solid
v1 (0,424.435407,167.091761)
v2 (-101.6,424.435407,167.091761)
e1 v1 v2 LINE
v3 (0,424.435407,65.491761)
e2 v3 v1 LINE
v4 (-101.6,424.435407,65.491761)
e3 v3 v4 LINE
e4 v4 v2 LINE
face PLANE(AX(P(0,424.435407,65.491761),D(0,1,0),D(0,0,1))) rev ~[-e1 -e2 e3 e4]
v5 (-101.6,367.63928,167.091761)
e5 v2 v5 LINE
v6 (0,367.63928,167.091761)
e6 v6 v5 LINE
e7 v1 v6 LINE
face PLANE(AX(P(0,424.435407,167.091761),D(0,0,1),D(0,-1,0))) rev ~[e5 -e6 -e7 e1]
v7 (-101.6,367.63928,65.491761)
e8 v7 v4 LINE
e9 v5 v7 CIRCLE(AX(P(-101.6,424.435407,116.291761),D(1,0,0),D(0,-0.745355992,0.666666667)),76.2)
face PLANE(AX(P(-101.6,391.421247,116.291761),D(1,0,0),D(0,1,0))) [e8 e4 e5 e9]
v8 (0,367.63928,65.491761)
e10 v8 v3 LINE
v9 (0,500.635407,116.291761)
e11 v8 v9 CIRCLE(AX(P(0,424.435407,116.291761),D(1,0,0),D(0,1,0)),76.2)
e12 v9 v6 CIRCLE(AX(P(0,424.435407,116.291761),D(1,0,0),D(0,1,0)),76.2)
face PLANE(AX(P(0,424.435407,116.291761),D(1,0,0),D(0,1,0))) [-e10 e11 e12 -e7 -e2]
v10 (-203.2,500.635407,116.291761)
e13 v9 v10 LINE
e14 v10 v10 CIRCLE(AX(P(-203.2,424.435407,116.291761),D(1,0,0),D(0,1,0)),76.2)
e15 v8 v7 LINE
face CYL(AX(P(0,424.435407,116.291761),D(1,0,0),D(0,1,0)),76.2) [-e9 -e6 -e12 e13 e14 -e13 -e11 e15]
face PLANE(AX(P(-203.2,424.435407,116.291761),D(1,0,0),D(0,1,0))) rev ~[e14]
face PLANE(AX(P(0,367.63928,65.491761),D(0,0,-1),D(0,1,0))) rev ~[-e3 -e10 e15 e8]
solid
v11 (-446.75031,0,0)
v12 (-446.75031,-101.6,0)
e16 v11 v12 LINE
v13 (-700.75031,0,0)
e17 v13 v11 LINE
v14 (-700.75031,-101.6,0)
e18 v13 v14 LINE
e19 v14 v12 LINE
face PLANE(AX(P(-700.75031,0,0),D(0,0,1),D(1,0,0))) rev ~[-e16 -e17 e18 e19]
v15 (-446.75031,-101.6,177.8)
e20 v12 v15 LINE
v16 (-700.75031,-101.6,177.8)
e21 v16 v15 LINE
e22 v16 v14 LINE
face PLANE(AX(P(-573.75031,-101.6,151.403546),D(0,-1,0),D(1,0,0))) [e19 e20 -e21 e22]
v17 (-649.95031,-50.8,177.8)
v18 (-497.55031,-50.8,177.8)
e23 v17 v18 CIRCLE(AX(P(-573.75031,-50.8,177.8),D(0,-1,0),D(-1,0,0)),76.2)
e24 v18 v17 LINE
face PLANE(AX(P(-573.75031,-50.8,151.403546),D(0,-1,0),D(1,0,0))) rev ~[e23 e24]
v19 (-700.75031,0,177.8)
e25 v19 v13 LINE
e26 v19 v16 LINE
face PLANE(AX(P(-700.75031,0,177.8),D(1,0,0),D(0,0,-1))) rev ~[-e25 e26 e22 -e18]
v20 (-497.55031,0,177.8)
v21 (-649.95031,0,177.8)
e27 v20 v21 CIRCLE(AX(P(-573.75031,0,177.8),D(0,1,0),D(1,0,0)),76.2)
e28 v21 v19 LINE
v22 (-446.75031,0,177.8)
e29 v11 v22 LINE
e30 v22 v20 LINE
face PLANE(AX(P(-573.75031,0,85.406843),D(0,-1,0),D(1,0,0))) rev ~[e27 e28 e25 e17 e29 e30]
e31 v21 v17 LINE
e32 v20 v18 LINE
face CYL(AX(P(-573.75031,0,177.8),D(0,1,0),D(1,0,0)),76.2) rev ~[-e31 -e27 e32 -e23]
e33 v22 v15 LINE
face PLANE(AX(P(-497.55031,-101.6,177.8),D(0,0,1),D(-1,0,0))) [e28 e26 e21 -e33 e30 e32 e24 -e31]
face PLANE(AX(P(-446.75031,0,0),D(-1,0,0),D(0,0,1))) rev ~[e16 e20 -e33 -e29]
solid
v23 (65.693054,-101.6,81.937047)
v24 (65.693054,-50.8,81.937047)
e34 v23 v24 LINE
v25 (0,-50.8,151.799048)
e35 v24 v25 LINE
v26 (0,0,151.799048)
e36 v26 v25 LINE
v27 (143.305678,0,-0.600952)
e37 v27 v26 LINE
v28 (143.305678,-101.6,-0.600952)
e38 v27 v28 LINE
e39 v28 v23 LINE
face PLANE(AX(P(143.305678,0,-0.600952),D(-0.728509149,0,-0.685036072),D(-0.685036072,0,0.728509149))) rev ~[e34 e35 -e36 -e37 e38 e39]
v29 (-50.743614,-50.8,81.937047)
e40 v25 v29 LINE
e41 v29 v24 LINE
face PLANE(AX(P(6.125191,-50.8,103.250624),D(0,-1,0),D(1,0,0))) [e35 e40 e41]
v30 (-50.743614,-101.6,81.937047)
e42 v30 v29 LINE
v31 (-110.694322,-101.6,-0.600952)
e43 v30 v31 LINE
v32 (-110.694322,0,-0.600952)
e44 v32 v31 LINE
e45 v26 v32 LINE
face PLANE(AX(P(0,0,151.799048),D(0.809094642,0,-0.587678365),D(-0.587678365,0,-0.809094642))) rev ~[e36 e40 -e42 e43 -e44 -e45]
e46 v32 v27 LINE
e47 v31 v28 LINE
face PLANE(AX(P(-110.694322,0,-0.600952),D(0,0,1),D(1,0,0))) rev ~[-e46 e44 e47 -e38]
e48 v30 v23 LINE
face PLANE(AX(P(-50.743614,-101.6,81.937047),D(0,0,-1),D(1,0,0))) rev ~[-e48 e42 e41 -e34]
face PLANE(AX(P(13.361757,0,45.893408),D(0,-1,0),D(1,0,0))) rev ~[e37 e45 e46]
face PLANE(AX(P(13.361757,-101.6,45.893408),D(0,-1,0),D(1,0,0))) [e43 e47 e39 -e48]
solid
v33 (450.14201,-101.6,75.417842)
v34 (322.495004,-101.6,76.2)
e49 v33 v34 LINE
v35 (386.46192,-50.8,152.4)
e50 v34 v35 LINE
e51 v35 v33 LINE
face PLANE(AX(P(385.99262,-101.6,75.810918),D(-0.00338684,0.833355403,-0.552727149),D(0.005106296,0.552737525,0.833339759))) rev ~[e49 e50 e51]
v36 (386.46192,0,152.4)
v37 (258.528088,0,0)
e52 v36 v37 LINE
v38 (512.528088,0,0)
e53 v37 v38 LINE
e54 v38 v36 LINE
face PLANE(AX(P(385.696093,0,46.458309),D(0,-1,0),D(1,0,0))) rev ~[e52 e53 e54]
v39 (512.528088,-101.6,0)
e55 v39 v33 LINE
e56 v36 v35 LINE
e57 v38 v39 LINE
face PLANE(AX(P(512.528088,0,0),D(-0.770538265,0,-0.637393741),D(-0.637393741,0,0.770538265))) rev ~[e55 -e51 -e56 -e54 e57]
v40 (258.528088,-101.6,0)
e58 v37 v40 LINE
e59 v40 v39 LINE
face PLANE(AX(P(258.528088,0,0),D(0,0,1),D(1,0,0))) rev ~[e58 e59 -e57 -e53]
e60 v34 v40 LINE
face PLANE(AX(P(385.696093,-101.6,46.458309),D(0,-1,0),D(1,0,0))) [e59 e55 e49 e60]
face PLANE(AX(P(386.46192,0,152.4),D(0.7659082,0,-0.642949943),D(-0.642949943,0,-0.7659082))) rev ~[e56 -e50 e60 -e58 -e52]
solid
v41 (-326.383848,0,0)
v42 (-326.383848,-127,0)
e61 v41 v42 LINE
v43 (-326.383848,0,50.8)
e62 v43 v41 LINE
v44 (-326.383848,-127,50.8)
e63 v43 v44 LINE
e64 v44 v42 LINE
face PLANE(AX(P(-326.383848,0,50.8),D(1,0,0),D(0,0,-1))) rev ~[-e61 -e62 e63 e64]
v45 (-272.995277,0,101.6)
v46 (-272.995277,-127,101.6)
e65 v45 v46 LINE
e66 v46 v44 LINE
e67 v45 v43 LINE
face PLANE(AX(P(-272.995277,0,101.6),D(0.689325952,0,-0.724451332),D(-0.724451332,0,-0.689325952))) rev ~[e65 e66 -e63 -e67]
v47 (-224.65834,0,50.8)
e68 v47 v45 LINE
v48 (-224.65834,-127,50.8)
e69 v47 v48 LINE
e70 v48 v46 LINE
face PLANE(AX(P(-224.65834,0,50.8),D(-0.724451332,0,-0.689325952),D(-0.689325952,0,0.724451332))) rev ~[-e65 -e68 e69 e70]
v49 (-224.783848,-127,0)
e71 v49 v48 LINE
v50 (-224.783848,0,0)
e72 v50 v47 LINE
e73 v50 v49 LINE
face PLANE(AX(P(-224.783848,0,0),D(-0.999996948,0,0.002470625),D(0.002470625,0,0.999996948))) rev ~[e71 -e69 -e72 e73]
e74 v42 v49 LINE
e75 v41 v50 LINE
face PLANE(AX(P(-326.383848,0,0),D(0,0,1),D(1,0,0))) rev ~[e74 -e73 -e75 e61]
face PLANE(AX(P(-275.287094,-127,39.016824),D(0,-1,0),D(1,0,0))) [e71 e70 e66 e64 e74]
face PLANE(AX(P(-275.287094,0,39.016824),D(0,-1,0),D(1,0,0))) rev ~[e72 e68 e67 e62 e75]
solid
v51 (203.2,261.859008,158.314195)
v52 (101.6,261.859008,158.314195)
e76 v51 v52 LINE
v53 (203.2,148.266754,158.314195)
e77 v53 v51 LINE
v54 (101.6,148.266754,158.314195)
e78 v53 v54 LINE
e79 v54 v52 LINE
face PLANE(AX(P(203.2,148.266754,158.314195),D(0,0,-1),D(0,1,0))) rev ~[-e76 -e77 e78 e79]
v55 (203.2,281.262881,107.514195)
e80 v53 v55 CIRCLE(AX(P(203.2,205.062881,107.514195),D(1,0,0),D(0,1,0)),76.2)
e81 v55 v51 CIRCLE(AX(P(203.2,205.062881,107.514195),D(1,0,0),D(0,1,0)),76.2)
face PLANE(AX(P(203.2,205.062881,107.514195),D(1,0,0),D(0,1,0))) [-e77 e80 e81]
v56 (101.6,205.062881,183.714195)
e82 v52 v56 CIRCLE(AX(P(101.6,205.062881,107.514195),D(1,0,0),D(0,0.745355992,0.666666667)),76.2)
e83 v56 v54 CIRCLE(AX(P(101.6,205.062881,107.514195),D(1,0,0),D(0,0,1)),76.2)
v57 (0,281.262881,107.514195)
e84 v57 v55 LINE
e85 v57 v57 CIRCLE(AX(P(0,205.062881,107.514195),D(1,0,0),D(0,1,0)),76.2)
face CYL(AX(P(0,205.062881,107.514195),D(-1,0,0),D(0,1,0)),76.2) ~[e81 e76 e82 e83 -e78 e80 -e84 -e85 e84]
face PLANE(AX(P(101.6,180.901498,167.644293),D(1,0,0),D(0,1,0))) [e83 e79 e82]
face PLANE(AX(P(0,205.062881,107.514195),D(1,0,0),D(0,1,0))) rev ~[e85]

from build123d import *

# Parameters (mm, degrees)
F1_DEPTH  = 101.6
F3_DEPTH  = 50.8
F5_DEPTH  = 101.6
F9_DEPTH  = 177.8
F11_DEPTH = 127
F16_R     = 76.2
F17_DEPTH = 203.2
F19_DEPTH = 101.6
F20_R     = 76.2
F21_DEPTH = 203.2
F23_DEPTH = 101.6
F25_DEPTH = 101.6
F27_DEPTH = 50.8


# Not quite as in the source:
# - the program builds the solid bodies; features that only make, move or delete a surface that nothing else refers to are left out


with BuildPart() as f1:
    # F0 (on Front) → F1 (new body)
    with BuildSketch(Plane.XZ):
        Polygon((0, 151.7990483895), (-110.6943220668, -0.6009516105), (143.3056779332, -0.6009516105), align=None)
    extrude(amount=F1_DEPTH)

    # F2 (on face) → F3 (cut)
    with BuildSketch(Plane.XZ.offset(101.6)):
        Polygon((-50.7436143692, 81.9370474714), (0, 81.9370474714), (65.6930538277, 81.9370474714), (0, 151.7990483895), align=None)
    extrude(amount=-F3_DEPTH, mode=Mode.SUBTRACT)


with BuildPart() as f5:
    # F4 (on Front) → F5 (new body)
    with BuildSketch(Plane.XZ):
        Polygon((386.4619200636, 152.4), (258.5280877834, 0), (512.5280877834, 0), align=None)
    extrude(amount=F5_DEPTH)

    # F8 (on 3pt) → F9 (cut, symmetric)
    with BuildSketch(Plane(origin=(385.5136131508, 0, -2.362237903), x_dir=(0, 1, 0), z_dir=(0.9999812273, 0, -0.0061273934))):
        Polygon((-50.8, 154.765143255), (-101.6, 154.765143255), (-101.6, 78.1746232731), align=None)
    extrude(amount=F9_DEPTH, both=True, mode=Mode.SUBTRACT)


with BuildPart() as f11:
    # F10 (on Front) → F11 (new body)
    with BuildSketch(Plane.XZ):
        Polygon((-326.3838480476, 0), (-224.7838480476, 0), (-224.6583398959, 50.8), (-272.99527684, 101.6), (-326.3838480476, 50.8), align=None)
    extrude(amount=F11_DEPTH)


with BuildPart() as f17:
    # F16 (on Right) → F17 (new body)
    with BuildSketch(Plane.YZ):
        with Locations((205.0628811121, 107.5141951442)):
            Circle(F16_R)
    extrude(amount=F17_DEPTH)

    # F18 (on face) → F19 (cut)
    with BuildSketch(Plane.YZ.offset(203.2)):
        with BuildLine():
            ThreePointArc((205.0628811121, 183.7141951442), (173.9543613788, 177.0749599473), (148.2667544836, 158.3141951442))
            Line((148.2667544836, 158.3141951442), (205.0628811121, 158.3141951442))
            Line((205.0628811121, 158.3141951442), (205.0628811121, 183.7141951442))
        make_face()
        with BuildLine():
            Line((205.0628811121, 183.7141951442), (205.0628811121, 158.3141951442))
            Line((205.0628811121, 158.3141951442), (261.8590077406, 158.3141951442))
            ThreePointArc((261.8590077406, 158.3141951442), (236.1714008454, 177.0749599473), (205.0628811121, 183.7141951442))
        make_face()
    extrude(amount=-F19_DEPTH, mode=Mode.SUBTRACT)


with BuildPart() as f21:
    # F20 (on Right) → F21 (new body)
    with BuildSketch(Plane.YZ):
        with Locations((424.4354069233, 116.2917613983)):
            Circle(F20_R)
    extrude(amount=-F21_DEPTH)

    # F22 (on face) → F23 (cut)
    with BuildSketch(Plane.YZ):
        with BuildLine():
            Line((424.4354069233, 65.4917613983), (424.4354069233, 116.2917613983))
            Line((424.4354069233, 116.2917613983), (424.4354069233, 167.0917613983))
            Line((424.4354069233, 167.0917613983), (367.6392802948, 167.0917613983))
            ThreePointArc((367.6392802948, 167.0917613983), (348.2354069233, 116.2917613983), (367.6392802948, 65.4917613983))
            Line((367.6392802948, 65.4917613983), (424.4354069233, 65.4917613983))
        make_face()
    extrude(amount=-F23_DEPTH, mode=Mode.SUBTRACT)


with BuildPart() as f25:
    # F24 (on Front) → F25 (new body)
    with BuildSketch(Plane.XZ):
        with BuildLine():
            Line((-700.7503095217, 0), (-446.7503095217, 0))
            Line((-446.7503095217, 0), (-446.7503095217, 177.8))
            Line((-446.7503095217, 177.8), (-497.5503095217, 177.8))
            ThreePointArc((-497.5503095217, 177.8), (-573.7503095217, 101.6), (-649.9503095217, 177.8))
            Line((-649.9503095217, 177.8), (-700.7503095217, 177.8))
            Line((-700.7503095217, 177.8), (-700.7503095217, 0))
        make_face()
    extrude(amount=F25_DEPTH)

    # F26 (on face) → F27 (join)
    with BuildSketch(Plane.XZ.offset(101.6)):
        with BuildLine():
            ThreePointArc((-649.9503095217, 177.8), (-573.7503095217, 101.6), (-497.5503095217, 177.8))
            Line((-497.5503095217, 177.8), (-649.9503095217, 177.8))
        make_face()
    extrude(amount=-F27_DEPTH)


solid = Compound([f1.part, f5.part, f11.part, f17.part, f21.part, f25.part])
